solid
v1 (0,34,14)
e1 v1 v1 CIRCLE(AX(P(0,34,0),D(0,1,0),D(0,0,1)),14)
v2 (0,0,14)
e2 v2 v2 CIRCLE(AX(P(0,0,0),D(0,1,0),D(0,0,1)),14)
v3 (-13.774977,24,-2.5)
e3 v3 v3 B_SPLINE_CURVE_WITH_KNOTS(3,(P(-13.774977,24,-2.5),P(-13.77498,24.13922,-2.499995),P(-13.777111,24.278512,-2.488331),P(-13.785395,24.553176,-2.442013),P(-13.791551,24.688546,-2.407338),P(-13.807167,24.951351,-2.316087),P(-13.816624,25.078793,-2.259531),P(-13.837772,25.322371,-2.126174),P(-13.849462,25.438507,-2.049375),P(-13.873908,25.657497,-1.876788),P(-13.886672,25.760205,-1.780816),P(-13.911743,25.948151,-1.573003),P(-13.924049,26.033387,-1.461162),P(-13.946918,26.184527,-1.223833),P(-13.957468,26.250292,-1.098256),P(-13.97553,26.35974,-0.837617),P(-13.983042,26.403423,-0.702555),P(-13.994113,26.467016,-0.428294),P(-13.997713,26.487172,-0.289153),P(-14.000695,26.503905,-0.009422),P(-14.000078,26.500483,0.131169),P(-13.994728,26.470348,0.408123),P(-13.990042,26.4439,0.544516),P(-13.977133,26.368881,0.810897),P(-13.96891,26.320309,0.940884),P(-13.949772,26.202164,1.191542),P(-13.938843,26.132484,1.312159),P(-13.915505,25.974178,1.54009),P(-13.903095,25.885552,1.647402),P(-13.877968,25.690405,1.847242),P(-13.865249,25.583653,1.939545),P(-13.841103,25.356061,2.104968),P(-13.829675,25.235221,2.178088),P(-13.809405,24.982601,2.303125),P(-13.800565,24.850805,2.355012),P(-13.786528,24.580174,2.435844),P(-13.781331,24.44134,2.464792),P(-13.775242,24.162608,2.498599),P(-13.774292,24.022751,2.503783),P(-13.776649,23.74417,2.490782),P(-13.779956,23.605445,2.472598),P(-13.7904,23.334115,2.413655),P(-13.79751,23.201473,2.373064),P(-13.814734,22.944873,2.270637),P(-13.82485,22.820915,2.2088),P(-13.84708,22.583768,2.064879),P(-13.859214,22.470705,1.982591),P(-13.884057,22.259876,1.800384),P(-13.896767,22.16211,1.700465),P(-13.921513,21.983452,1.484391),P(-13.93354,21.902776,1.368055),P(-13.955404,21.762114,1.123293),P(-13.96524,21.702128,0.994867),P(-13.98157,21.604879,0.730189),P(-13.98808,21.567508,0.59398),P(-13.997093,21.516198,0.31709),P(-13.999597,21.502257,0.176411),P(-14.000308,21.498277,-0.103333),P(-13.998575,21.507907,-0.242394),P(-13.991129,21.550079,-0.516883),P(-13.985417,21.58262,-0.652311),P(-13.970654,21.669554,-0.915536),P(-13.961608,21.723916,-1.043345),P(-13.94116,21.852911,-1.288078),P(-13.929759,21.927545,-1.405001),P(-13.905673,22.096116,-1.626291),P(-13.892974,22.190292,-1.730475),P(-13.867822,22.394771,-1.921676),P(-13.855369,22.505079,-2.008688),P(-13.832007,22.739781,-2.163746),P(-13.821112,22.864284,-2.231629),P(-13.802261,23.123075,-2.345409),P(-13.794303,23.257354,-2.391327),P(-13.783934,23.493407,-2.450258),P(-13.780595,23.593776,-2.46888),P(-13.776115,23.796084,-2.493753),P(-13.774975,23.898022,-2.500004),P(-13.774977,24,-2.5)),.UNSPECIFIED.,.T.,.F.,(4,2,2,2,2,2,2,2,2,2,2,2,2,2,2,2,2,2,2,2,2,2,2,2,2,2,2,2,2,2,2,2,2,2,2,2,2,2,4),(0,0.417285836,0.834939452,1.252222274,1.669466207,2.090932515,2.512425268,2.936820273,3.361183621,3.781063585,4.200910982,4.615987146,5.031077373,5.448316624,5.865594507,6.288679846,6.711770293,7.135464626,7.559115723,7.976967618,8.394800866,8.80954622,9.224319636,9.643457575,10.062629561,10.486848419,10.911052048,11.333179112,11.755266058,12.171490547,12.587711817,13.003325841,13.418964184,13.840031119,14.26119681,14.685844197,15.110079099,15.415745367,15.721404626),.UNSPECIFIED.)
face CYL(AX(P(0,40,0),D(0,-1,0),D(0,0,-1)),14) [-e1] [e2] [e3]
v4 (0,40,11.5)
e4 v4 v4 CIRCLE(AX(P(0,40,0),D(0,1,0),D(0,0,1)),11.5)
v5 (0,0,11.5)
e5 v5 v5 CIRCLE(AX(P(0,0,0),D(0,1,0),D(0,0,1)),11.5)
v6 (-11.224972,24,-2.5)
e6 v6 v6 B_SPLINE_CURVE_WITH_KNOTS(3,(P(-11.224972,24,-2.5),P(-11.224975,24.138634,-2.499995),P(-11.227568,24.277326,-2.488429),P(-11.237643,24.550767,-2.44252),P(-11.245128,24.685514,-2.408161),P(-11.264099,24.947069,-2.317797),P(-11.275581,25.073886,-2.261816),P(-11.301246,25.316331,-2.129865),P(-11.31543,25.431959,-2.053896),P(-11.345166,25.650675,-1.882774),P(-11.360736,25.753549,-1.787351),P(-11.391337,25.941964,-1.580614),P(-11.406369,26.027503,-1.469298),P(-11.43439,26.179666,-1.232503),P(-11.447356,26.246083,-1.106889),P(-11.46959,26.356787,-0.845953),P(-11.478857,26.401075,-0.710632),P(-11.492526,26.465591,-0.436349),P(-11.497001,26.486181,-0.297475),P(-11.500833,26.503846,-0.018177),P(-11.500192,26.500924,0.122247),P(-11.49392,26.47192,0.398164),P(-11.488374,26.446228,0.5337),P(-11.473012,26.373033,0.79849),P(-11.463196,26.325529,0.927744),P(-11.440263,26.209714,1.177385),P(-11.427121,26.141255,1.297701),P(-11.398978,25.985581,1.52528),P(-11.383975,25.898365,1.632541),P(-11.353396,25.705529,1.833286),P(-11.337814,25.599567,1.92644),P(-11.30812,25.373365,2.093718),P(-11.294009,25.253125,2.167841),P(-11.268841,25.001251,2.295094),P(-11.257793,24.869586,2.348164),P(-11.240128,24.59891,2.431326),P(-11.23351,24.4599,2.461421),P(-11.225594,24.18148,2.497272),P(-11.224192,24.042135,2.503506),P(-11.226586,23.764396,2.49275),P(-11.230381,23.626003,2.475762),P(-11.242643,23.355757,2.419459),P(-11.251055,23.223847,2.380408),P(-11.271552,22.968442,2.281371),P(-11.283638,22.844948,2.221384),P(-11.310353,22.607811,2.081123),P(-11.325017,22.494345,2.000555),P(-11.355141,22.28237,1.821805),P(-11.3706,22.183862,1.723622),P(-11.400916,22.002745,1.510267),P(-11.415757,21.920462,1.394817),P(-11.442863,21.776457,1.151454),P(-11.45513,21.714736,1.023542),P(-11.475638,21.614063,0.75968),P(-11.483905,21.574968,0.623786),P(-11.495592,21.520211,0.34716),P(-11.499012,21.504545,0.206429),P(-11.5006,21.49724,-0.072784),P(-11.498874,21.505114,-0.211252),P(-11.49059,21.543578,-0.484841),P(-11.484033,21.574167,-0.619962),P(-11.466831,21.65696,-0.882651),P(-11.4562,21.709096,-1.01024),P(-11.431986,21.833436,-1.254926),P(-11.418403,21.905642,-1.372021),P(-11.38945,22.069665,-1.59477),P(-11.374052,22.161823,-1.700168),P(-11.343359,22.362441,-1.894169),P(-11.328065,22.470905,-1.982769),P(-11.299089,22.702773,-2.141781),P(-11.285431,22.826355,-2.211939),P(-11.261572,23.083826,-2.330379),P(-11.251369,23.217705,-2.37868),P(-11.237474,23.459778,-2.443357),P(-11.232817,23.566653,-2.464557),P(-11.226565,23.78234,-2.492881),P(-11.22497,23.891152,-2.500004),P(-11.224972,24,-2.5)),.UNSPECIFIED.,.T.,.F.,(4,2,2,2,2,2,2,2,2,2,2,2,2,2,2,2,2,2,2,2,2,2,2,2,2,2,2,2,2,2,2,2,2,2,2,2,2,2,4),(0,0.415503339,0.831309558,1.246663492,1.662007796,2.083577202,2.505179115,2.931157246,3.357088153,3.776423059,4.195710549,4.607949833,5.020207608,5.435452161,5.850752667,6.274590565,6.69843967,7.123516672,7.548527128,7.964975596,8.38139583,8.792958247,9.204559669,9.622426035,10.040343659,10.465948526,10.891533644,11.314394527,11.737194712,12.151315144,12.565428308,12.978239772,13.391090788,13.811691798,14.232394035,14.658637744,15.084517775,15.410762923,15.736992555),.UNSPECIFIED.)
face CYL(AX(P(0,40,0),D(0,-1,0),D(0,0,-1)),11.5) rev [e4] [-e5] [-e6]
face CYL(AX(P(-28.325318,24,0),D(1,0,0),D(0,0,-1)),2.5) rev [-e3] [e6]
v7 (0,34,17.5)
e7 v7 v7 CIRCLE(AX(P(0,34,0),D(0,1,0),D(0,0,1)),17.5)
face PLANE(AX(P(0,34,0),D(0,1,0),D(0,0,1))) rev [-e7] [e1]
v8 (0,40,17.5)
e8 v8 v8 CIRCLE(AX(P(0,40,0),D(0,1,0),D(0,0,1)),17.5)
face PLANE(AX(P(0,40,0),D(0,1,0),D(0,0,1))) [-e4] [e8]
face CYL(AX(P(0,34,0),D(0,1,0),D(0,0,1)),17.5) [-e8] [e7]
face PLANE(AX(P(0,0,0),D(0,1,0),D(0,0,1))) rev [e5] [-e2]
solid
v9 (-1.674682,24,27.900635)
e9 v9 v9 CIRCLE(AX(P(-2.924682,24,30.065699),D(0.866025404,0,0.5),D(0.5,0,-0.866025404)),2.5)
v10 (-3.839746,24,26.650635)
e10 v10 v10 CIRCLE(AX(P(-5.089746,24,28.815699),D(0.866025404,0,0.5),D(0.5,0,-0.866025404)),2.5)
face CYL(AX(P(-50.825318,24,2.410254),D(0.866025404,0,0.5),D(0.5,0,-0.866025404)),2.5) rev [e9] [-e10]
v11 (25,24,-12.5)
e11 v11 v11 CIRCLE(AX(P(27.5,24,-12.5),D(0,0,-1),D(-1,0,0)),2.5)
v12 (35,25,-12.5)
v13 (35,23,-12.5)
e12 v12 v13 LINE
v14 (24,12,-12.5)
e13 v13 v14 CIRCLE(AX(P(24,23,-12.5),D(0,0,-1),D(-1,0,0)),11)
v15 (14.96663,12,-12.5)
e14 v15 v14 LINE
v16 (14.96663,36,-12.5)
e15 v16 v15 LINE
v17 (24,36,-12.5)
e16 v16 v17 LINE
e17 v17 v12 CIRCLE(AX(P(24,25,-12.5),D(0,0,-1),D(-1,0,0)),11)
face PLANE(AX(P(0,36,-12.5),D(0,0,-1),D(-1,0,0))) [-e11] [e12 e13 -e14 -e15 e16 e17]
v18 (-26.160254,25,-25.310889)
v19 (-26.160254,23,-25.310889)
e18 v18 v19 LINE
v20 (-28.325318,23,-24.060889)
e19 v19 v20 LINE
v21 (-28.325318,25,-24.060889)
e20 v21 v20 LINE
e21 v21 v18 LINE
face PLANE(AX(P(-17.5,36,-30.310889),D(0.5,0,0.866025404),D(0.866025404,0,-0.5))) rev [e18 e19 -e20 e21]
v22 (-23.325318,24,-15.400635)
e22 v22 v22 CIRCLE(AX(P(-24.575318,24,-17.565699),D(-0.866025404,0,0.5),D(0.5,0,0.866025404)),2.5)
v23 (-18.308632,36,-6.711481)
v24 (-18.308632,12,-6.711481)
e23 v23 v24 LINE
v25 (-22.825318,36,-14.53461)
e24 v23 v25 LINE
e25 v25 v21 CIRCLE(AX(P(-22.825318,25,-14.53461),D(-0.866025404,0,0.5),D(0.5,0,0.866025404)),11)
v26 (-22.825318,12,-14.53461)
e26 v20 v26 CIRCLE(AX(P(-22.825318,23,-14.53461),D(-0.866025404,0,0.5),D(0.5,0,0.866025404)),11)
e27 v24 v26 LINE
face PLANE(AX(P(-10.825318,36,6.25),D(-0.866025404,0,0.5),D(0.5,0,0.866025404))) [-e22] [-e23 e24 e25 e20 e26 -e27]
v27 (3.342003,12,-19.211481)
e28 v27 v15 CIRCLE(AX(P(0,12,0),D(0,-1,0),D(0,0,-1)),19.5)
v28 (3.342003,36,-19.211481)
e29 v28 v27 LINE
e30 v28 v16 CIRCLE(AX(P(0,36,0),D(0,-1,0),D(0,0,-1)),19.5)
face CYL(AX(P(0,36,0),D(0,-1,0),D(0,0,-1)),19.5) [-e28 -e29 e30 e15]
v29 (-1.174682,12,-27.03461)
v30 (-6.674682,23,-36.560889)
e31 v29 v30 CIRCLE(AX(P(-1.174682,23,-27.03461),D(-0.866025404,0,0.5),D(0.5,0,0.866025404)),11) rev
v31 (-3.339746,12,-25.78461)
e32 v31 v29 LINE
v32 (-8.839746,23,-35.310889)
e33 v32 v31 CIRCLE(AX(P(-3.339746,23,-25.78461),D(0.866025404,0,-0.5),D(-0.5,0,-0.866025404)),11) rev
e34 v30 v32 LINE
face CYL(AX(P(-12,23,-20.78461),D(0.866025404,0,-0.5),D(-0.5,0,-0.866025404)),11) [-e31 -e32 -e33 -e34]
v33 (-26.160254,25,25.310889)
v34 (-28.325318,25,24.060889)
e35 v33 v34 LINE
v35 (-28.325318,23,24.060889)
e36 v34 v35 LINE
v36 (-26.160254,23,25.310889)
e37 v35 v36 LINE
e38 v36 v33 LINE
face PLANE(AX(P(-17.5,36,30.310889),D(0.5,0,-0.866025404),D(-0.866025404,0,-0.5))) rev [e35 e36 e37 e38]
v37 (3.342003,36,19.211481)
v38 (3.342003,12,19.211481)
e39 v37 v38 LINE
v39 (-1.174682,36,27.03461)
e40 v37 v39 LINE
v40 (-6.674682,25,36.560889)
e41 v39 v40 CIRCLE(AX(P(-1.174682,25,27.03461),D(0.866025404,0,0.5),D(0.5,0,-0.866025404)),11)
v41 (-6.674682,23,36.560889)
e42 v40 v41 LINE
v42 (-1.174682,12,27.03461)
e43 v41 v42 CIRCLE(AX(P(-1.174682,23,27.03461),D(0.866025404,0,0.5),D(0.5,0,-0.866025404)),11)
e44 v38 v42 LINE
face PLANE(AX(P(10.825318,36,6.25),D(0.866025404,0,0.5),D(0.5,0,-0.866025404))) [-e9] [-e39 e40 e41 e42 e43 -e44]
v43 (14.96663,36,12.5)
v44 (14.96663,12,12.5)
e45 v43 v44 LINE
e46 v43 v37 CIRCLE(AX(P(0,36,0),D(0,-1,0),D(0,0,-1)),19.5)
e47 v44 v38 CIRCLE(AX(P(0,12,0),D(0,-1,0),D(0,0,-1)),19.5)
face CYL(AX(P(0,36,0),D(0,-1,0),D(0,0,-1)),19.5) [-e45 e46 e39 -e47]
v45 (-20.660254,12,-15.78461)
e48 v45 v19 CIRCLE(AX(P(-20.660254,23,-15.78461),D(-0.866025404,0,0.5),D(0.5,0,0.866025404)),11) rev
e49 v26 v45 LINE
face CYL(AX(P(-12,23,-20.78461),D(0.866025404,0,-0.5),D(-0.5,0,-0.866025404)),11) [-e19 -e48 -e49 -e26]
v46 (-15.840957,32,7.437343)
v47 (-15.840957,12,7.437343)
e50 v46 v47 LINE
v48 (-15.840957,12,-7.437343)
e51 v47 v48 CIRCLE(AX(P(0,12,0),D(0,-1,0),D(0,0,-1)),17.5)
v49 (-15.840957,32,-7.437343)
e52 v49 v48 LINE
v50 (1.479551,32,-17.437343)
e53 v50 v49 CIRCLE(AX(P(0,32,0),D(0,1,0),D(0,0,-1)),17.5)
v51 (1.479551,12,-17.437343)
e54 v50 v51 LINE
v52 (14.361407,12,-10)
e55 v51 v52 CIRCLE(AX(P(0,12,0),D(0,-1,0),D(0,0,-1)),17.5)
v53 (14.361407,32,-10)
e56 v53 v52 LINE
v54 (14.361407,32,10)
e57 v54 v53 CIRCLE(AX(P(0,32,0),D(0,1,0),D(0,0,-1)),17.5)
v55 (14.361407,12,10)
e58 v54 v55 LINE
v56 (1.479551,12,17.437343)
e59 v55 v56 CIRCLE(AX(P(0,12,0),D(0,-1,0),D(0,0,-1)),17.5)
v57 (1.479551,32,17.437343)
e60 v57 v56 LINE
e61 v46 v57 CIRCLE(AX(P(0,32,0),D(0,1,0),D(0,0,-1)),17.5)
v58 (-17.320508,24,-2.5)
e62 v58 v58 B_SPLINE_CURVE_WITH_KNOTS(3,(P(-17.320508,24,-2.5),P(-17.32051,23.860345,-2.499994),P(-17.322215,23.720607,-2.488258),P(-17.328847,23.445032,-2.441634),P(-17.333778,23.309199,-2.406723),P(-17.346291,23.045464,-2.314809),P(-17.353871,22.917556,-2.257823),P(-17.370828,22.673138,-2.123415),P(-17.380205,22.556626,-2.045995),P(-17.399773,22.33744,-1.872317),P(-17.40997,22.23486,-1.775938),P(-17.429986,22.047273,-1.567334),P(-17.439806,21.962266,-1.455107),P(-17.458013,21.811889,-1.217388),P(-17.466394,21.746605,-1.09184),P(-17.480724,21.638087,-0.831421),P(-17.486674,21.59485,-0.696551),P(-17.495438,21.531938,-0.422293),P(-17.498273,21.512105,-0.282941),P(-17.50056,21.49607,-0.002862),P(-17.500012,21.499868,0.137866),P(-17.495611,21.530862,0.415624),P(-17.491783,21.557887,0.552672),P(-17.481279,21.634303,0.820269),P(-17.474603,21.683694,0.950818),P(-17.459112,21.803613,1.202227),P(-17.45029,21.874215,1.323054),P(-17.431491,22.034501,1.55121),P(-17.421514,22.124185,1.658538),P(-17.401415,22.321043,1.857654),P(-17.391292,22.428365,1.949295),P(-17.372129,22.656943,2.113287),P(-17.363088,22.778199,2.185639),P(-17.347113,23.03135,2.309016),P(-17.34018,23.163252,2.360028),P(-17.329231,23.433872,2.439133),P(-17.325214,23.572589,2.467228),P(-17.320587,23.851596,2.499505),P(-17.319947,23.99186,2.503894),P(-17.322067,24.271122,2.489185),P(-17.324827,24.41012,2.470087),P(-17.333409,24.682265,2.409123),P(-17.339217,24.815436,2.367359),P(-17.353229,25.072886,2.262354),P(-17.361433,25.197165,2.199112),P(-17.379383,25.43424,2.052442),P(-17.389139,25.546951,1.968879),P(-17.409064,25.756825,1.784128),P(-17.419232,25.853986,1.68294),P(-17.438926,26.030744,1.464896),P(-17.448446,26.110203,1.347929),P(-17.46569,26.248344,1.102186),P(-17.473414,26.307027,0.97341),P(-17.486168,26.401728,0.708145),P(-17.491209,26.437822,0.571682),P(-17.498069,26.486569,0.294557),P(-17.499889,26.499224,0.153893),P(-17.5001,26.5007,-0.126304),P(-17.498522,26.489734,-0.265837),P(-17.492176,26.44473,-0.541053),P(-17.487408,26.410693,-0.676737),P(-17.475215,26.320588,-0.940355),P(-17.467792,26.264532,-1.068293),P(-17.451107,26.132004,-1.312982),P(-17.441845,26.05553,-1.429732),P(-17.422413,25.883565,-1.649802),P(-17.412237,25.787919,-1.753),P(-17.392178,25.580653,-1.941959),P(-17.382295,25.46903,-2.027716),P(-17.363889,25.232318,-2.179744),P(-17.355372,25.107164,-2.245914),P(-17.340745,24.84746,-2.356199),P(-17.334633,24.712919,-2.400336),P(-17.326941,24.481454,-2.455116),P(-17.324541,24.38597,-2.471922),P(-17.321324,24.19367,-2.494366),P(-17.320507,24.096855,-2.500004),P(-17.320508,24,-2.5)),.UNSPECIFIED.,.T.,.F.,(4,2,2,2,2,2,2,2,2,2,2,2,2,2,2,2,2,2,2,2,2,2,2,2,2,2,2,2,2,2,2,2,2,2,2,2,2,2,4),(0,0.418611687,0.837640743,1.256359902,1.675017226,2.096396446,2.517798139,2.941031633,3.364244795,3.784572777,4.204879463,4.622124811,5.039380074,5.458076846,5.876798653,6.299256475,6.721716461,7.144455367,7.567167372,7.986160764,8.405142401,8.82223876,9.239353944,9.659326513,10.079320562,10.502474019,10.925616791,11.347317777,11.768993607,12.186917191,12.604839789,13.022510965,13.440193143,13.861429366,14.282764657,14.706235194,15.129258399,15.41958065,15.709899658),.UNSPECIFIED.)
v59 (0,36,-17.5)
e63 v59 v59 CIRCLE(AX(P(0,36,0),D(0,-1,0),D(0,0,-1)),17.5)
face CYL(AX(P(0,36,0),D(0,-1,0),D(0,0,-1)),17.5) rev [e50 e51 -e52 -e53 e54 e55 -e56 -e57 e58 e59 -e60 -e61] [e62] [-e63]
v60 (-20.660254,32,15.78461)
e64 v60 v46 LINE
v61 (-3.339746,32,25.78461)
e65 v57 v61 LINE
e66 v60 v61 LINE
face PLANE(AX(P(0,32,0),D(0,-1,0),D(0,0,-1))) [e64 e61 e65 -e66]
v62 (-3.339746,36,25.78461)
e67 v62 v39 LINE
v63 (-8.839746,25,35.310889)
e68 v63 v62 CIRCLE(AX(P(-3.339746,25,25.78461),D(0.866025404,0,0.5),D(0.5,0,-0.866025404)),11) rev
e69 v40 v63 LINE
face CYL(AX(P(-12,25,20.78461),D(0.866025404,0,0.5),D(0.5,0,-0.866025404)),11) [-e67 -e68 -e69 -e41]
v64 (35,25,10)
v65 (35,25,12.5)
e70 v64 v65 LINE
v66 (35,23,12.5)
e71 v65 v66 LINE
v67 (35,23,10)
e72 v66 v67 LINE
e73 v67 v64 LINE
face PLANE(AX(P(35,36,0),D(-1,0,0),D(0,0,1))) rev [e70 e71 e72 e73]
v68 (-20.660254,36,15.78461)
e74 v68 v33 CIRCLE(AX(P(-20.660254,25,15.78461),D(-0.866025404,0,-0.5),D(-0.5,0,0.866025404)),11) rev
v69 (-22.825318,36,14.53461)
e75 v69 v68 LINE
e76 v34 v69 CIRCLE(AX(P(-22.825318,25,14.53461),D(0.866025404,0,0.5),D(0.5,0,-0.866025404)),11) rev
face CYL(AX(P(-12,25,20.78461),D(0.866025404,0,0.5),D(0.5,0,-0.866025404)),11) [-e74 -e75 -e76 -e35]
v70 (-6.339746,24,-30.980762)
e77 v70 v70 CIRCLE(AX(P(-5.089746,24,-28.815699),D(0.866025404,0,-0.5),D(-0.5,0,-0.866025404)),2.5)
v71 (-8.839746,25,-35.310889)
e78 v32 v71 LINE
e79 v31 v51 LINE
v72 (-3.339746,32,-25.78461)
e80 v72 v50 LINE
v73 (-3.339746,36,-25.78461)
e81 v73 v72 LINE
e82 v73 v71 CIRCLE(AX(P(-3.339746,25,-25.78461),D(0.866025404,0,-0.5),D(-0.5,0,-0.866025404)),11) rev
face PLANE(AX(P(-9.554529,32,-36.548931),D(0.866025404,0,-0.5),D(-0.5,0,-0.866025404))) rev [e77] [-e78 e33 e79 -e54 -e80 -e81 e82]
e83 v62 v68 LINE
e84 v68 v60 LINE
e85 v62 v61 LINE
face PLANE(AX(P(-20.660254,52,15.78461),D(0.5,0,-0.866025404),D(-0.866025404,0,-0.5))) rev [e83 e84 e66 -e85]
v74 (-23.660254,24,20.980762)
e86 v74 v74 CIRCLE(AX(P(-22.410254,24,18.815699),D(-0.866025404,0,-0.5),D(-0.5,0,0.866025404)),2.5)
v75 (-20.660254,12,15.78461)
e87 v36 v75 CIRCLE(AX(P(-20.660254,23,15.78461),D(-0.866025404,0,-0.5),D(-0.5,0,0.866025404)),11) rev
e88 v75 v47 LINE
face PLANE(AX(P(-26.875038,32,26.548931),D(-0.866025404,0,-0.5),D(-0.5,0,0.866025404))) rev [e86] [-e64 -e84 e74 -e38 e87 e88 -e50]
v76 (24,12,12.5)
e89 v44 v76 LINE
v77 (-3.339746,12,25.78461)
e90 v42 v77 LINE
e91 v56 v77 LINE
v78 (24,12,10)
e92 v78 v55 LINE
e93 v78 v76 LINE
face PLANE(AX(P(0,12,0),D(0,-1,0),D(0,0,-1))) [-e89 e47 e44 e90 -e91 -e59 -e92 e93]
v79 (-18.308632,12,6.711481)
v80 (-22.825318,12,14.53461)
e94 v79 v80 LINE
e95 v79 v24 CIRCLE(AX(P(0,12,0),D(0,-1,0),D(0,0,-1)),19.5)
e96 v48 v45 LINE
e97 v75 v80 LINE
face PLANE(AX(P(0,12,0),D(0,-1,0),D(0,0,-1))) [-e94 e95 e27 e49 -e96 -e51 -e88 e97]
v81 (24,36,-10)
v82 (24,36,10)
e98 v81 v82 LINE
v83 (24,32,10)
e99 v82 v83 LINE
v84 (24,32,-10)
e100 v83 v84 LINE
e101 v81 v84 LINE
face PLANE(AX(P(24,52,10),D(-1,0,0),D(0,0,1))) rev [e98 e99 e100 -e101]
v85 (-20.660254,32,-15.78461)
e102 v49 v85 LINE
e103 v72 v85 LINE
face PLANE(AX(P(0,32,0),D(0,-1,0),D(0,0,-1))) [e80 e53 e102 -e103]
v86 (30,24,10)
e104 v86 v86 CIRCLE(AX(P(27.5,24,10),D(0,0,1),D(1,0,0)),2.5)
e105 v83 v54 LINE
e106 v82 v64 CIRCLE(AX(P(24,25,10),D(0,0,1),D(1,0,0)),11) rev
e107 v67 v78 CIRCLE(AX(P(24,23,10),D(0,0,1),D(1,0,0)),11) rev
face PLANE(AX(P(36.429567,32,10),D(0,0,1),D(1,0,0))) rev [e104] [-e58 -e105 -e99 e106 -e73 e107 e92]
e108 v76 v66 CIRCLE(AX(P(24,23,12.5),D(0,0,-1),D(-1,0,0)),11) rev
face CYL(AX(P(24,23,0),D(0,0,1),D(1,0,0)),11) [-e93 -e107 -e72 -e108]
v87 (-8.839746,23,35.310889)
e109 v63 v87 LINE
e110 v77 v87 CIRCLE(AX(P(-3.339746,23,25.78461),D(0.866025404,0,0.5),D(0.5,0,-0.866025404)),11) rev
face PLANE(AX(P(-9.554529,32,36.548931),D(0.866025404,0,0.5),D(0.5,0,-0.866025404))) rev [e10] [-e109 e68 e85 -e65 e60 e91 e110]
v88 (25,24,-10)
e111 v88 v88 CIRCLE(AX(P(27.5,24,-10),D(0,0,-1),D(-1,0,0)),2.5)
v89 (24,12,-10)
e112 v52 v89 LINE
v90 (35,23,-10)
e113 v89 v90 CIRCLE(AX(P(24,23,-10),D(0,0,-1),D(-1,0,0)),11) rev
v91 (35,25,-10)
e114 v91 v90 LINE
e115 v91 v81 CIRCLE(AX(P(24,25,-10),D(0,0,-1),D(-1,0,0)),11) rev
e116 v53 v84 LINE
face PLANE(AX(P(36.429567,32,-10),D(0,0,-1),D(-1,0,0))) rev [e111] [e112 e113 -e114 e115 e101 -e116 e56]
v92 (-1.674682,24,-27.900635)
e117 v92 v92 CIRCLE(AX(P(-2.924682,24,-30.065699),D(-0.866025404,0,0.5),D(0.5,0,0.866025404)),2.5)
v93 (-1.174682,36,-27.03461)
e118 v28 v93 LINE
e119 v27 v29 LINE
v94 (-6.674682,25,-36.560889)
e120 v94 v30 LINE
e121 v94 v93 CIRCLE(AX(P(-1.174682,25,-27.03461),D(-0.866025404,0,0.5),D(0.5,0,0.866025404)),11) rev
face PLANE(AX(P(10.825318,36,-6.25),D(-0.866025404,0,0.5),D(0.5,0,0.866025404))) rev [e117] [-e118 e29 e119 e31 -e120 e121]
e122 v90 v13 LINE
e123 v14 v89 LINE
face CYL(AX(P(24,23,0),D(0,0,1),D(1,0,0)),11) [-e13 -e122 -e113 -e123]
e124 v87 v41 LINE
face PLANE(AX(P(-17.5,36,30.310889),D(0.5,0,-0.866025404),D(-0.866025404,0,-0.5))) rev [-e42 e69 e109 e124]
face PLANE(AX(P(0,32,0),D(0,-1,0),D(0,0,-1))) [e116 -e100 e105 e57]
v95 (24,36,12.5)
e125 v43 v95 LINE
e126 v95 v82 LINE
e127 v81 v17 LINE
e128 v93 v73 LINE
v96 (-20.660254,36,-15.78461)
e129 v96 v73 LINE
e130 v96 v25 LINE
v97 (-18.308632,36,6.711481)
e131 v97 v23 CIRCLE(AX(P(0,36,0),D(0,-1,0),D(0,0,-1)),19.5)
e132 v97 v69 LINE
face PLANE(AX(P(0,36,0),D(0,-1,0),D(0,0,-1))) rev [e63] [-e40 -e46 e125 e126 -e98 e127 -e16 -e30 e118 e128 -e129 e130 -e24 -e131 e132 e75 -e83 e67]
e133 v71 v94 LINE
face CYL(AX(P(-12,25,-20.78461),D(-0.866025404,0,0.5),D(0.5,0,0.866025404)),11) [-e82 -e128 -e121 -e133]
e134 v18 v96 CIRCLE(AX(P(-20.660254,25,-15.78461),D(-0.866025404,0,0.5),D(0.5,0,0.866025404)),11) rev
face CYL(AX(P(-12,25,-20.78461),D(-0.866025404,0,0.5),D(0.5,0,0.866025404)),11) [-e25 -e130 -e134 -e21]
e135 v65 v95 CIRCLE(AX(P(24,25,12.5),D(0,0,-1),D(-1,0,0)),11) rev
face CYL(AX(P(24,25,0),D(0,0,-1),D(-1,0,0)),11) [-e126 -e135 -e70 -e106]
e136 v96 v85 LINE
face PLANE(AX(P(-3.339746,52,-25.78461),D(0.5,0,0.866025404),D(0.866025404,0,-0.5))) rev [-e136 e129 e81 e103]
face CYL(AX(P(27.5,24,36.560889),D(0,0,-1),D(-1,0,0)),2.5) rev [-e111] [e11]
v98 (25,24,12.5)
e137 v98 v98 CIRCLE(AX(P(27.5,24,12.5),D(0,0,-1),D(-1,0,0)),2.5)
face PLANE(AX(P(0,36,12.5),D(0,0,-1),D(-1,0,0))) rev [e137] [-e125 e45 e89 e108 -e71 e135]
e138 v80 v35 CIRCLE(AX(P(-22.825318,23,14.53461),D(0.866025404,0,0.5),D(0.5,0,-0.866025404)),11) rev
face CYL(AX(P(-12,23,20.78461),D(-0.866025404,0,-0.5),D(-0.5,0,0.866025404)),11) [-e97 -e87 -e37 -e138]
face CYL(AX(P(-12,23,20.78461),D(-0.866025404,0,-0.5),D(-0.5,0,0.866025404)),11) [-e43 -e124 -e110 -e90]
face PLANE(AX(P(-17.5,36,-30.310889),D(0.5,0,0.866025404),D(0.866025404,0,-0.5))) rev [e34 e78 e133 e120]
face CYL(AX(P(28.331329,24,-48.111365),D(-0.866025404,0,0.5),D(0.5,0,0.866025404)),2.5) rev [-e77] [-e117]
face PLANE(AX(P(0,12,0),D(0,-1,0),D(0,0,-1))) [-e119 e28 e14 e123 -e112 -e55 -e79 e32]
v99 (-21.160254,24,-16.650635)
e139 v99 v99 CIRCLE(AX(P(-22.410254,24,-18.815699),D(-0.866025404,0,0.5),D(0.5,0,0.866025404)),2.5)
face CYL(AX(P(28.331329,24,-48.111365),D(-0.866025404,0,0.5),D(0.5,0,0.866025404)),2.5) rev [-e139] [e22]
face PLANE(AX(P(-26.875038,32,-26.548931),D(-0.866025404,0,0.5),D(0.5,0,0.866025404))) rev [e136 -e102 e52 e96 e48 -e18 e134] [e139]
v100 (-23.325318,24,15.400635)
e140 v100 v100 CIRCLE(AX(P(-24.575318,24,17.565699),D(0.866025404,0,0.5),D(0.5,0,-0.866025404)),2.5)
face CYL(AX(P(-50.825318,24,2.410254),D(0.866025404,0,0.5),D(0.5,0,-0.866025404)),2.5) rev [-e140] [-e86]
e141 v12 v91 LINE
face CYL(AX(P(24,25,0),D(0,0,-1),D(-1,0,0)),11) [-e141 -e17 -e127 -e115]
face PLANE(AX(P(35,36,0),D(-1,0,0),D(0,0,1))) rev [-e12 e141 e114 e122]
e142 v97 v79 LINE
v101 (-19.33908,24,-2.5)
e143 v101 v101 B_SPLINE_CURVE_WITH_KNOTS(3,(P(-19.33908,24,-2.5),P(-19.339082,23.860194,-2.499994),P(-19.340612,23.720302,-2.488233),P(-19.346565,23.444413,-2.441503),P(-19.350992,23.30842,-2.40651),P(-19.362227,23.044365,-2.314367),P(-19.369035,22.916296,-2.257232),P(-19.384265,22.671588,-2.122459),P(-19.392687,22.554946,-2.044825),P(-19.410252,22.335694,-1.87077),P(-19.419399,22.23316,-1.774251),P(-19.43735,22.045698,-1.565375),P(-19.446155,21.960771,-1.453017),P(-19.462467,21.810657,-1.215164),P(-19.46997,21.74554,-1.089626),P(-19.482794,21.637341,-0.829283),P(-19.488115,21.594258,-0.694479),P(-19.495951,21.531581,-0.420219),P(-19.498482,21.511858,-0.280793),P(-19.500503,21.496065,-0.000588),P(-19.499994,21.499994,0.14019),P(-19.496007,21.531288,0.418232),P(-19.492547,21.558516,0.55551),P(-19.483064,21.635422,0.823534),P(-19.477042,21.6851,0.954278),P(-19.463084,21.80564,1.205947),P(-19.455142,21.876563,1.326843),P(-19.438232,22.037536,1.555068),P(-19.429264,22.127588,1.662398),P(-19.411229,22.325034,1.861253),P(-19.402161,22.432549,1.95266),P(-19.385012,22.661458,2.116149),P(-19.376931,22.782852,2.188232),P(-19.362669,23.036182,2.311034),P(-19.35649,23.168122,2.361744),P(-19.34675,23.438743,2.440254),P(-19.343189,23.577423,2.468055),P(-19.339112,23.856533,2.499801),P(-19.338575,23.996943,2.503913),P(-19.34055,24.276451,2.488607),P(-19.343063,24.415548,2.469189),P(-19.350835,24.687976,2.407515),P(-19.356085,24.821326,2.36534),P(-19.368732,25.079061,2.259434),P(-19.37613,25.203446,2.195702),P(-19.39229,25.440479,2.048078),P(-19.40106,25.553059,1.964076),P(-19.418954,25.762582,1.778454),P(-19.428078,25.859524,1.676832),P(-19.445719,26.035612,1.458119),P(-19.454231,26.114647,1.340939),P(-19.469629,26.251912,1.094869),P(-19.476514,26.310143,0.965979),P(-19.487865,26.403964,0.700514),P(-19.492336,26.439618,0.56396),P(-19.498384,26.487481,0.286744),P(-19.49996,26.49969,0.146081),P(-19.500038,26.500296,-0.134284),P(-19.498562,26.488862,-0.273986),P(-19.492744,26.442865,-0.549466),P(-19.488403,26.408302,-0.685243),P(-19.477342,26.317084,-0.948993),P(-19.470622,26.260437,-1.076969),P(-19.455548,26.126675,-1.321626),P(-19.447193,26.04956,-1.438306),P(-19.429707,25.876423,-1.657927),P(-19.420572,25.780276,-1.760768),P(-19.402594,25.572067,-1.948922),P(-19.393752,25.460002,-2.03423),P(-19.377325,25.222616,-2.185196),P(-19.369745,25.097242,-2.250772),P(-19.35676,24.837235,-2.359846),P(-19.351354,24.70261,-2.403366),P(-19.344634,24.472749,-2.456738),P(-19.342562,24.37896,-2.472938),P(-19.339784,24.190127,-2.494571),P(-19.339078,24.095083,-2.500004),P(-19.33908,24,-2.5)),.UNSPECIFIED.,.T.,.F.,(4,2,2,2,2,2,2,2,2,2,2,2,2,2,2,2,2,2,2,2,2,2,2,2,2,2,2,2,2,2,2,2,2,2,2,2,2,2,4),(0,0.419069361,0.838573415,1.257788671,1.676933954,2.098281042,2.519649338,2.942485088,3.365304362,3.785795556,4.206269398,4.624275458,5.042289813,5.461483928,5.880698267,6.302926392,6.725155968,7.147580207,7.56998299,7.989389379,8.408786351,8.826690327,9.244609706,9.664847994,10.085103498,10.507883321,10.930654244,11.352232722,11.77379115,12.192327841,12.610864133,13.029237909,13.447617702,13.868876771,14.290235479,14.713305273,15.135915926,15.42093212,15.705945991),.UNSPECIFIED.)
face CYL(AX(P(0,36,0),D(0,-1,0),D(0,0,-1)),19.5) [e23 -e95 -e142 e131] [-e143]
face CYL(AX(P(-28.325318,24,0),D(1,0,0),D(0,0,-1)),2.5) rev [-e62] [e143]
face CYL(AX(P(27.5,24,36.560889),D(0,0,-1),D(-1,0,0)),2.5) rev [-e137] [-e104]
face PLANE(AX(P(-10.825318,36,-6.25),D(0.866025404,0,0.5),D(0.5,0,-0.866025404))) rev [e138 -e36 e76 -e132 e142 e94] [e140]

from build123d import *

# Parameters (mm, degrees)
SKETCH1_R               = 14
SKETCH1_R_2             = 11.5
BOSS_EXTRUDE1_DEPTH     = 40
BOSS_EXTRUDE2_START     = -6
SKETCH2_R               = 17.5
SKETCH2_R_2             = 11.5
BOSS_EXTRUDE2_DEPTH     = 6
BOSS_EXTRUDE3_START     = -2
BOSS_EXTRUDE3_OUTLINE_R = 17.5
BOSS_EXTRUDE3_DEPTH     = 24
FILLET1_R               = 11
CUT_EXTRUDE1_DEPTH      = 20
SKETCH5_W               = 11
SKETCH5_H               = 20
CUT_EXTRUDE2_DEPTH      = 20
SKETCH7_R               = 2.5
CUT_EXTRUDE3_DEPTH      = 71.466619449
SKETCH9_R               = 2.5
CUT_EXTRUDE4_DEPTH      = 75.382336321
SKETCH10_R              = 2.5
CUT_EXTRUDE5_DEPTH      = 73.332363728
SKETCH11_R              = 2.5
CUT_EXTRUDE6_DEPTH      = 65.51122859


# Read off the part's stored shape, not the designer's step: Boss-Extrude3
with BuildPart() as part:
    # Sketch1 → Boss-Extrude1 (new body)
    with BuildSketch(Plane(origin=(0, 0, 0), x_dir=(1, 0, 0), z_dir=(0, 1, 0))):
        with Locations(Location((0, 0, 0), (0, 0, 270))):
            Circle(SKETCH1_R)
        with Locations(Location((0, 0, 0), (0, 0, 270))):
            Circle(SKETCH1_R_2, mode=Mode.SUBTRACT)
    extrude(amount=BOSS_EXTRUDE1_DEPTH)

    # Sketch2 → Boss-Extrude2 (add)
    with BuildSketch(Plane(origin=(0, 40, 0), x_dir=(1, 0, 0), z_dir=(0, 1, 0)).offset(BOSS_EXTRUDE2_START)):
        with Locations(Location((0, 0, 0), (0, 0, 270))):
            Circle(SKETCH2_R)
        with Locations(Location((0, 0, 0), (0, 0, 270))):
            Circle(SKETCH2_R_2, mode=Mode.SUBTRACT)
    extrude(amount=BOSS_EXTRUDE2_DEPTH)


with BuildPart() as body_2:
    # Boss-Extrude3 outline → Boss-Extrude3 (new body)
    with BuildSketch(Plane.XZ.offset(-34).offset(BOSS_EXTRUDE3_START)):
        with BuildLine():
            Line((-6.674682453, -36.560889132), (3.342002774, -19.211481397))
            ThreePointArc((3.342002774, -19.211481397), (9.75, -16.887495374), (14.966629547, -12.5))
            Line((14.966629547, -12.5), (35, -12.5))
            Line((35, -12.5), (35, 12.5))
            Line((35, 12.5), (14.966629547, 12.5))
            ThreePointArc((14.966629547, 12.5), (9.75, 16.887495374), (3.342002774, 19.211481397))
            Line((3.342002774, 19.211481397), (-6.674682453, 36.560889132))
            Line((-6.674682453, 36.560889132), (-28.325317547, 24.060889132))
            Line((-28.325317547, 24.060889132), (-18.308632321, 6.711481397))
            ThreePointArc((-18.308632321, 6.711481397), (-19.5, 0), (-18.308632321, -6.711481397))
            Line((-18.308632321, -6.711481397), (-28.325317547, -24.060889132))
            Line((-28.325317547, -24.060889132), (-6.674682453, -36.560889132))
        make_face()
        Circle(BOSS_EXTRUDE3_OUTLINE_R, mode=Mode.SUBTRACT)
    extrude(amount=BOSS_EXTRUDE3_DEPTH)

    # Fillet1
    fillet1_edges = [body_2.edges().sort_by_distance(p)[0] for p in [
        (35, 36, 0),
        (35, 12, 0),
        (-17.5, 12, 30.310889132),
        (-17.5, 36, 30.310889132),
        (-17.5, 12, -30.310889132),
        (-17.5, 36, -30.310889132),
    ]]
    fillet(fillet1_edges, radius=FILLET1_R)

    # Sketch4 → Cut-Extrude1 (cut)
    with BuildSketch(Plane.XZ.offset(-12)):
        with BuildLine():
            Line((36.429567038, 10), (14.361406616, 10))
            ThreePointArc((14.361406616, 10), (17.5, 0), (14.361406616, -10))
            Line((14.361406616, -10), (36.429567038, -10))
            Line((36.429567038, -10), (36.429567038, 10))
        make_face()
        with BuildLine():
            Line((-9.554529481, -36.548930504), (1.47955073, -17.437342964))
            ThreePointArc((1.47955073, -17.437342964), (-8.75, -15.155444566), (-15.840957346, -7.437342964))
            Line((-15.840957346, -7.437342964), (-26.875037557, -26.548930504))
            Line((-26.875037557, -26.548930504), (-9.554529481, -36.548930504))
        make_face()
        with BuildLine():
            Line((-26.875037557, 26.548930504), (-15.840957346, 7.437342964))
            ThreePointArc((-15.840957346, 7.437342964), (-8.75, 15.155444566), (1.47955073, 17.437342964))
            Line((1.47955073, 17.437342964), (-9.554529481, 36.548930504))
            Line((-9.554529481, 36.548930504), (-26.875037557, 26.548930504))
        make_face()
    extrude(amount=-CUT_EXTRUDE1_DEPTH, mode=Mode.SUBTRACT)

    # Sketch5 → Cut-Extrude2 (cut)
    with BuildSketch(Plane.XZ.offset(-32)):
        with Locations((29.5, 0)):
            Rectangle(SKETCH5_W, SKETCH5_H)
        Polygon((-3.339745962, -25.784609691), (-8.839745962, -35.310889132), (-26.160254038, -25.310889132), (-20.660254038, -15.784609691), align=None)
        Polygon((-20.660254038, 15.784609691), (-26.160254038, 25.310889132), (-8.839745962, 35.310889132), (-3.339745962, 25.784609691), align=None)
    extrude(amount=-CUT_EXTRUDE2_DEPTH, mode=Mode.SUBTRACT)

    # Sketch7 → Cut-Extrude3 (cut, through all)
    with BuildSketch(Plane(origin=(10.825317547, 0, 6.25), x_dir=(0.5000000000000043, 0, -0.8660254037844363), z_dir=(0.8660254037844363, 0, 0.5000000000000043))):
        with Locations((-27.5, 24)):
            Circle(SKETCH7_R)
    extrude(amount=-CUT_EXTRUDE3_DEPTH, mode=Mode.SUBTRACT)

    # Sketch9 → Cut-Extrude4 (cut, through all)
    with BuildSketch(Plane(origin=(-10.825317547, 0, 6.25), x_dir=(0.49999999999999195, 0, 0.8660254037844433), z_dir=(-0.8660254037844433, 0, 0.49999999999999195))):
        with Locations((-27.5, 24)):
            Circle(SKETCH9_R)
    extrude(amount=-CUT_EXTRUDE4_DEPTH, mode=Mode.SUBTRACT)

    # Sketch10 → Cut-Extrude5 (cut, through all)
    with BuildSketch(Plane(origin=(0, 0, -12.5), x_dir=(-1, 0, 0), z_dir=(0, 0, -1))):
        with Locations((-27.5, 24)):
            Circle(SKETCH10_R)
    extrude(amount=-CUT_EXTRUDE5_DEPTH, mode=Mode.SUBTRACT)


with BuildPart() as cut_extrude6_tool:
    # Sketch11 → Cut-Extrude6 (new, through all)
    with BuildSketch(Plane(origin=(0, 0, 0), x_dir=(0, 0, -1), z_dir=(1, 0, 0))):
        with Locations((0, 24)):
            Circle(SKETCH11_R)
    extrude(amount=-CUT_EXTRUDE6_DEPTH)


with BuildPart() as part_1:
    add(part.part)

    # Cut-Extrude6: cut by cut_extrude6_tool
    add(cut_extrude6_tool.part, mode=Mode.SUBTRACT)


with BuildPart() as body_2_1:
    add(body_2.part)

    # Cut-Extrude6: cut by cut_extrude6_tool
    add(cut_extrude6_tool.part, mode=Mode.SUBTRACT)


solid = Compound([part_1.part, body_2_1.part])
